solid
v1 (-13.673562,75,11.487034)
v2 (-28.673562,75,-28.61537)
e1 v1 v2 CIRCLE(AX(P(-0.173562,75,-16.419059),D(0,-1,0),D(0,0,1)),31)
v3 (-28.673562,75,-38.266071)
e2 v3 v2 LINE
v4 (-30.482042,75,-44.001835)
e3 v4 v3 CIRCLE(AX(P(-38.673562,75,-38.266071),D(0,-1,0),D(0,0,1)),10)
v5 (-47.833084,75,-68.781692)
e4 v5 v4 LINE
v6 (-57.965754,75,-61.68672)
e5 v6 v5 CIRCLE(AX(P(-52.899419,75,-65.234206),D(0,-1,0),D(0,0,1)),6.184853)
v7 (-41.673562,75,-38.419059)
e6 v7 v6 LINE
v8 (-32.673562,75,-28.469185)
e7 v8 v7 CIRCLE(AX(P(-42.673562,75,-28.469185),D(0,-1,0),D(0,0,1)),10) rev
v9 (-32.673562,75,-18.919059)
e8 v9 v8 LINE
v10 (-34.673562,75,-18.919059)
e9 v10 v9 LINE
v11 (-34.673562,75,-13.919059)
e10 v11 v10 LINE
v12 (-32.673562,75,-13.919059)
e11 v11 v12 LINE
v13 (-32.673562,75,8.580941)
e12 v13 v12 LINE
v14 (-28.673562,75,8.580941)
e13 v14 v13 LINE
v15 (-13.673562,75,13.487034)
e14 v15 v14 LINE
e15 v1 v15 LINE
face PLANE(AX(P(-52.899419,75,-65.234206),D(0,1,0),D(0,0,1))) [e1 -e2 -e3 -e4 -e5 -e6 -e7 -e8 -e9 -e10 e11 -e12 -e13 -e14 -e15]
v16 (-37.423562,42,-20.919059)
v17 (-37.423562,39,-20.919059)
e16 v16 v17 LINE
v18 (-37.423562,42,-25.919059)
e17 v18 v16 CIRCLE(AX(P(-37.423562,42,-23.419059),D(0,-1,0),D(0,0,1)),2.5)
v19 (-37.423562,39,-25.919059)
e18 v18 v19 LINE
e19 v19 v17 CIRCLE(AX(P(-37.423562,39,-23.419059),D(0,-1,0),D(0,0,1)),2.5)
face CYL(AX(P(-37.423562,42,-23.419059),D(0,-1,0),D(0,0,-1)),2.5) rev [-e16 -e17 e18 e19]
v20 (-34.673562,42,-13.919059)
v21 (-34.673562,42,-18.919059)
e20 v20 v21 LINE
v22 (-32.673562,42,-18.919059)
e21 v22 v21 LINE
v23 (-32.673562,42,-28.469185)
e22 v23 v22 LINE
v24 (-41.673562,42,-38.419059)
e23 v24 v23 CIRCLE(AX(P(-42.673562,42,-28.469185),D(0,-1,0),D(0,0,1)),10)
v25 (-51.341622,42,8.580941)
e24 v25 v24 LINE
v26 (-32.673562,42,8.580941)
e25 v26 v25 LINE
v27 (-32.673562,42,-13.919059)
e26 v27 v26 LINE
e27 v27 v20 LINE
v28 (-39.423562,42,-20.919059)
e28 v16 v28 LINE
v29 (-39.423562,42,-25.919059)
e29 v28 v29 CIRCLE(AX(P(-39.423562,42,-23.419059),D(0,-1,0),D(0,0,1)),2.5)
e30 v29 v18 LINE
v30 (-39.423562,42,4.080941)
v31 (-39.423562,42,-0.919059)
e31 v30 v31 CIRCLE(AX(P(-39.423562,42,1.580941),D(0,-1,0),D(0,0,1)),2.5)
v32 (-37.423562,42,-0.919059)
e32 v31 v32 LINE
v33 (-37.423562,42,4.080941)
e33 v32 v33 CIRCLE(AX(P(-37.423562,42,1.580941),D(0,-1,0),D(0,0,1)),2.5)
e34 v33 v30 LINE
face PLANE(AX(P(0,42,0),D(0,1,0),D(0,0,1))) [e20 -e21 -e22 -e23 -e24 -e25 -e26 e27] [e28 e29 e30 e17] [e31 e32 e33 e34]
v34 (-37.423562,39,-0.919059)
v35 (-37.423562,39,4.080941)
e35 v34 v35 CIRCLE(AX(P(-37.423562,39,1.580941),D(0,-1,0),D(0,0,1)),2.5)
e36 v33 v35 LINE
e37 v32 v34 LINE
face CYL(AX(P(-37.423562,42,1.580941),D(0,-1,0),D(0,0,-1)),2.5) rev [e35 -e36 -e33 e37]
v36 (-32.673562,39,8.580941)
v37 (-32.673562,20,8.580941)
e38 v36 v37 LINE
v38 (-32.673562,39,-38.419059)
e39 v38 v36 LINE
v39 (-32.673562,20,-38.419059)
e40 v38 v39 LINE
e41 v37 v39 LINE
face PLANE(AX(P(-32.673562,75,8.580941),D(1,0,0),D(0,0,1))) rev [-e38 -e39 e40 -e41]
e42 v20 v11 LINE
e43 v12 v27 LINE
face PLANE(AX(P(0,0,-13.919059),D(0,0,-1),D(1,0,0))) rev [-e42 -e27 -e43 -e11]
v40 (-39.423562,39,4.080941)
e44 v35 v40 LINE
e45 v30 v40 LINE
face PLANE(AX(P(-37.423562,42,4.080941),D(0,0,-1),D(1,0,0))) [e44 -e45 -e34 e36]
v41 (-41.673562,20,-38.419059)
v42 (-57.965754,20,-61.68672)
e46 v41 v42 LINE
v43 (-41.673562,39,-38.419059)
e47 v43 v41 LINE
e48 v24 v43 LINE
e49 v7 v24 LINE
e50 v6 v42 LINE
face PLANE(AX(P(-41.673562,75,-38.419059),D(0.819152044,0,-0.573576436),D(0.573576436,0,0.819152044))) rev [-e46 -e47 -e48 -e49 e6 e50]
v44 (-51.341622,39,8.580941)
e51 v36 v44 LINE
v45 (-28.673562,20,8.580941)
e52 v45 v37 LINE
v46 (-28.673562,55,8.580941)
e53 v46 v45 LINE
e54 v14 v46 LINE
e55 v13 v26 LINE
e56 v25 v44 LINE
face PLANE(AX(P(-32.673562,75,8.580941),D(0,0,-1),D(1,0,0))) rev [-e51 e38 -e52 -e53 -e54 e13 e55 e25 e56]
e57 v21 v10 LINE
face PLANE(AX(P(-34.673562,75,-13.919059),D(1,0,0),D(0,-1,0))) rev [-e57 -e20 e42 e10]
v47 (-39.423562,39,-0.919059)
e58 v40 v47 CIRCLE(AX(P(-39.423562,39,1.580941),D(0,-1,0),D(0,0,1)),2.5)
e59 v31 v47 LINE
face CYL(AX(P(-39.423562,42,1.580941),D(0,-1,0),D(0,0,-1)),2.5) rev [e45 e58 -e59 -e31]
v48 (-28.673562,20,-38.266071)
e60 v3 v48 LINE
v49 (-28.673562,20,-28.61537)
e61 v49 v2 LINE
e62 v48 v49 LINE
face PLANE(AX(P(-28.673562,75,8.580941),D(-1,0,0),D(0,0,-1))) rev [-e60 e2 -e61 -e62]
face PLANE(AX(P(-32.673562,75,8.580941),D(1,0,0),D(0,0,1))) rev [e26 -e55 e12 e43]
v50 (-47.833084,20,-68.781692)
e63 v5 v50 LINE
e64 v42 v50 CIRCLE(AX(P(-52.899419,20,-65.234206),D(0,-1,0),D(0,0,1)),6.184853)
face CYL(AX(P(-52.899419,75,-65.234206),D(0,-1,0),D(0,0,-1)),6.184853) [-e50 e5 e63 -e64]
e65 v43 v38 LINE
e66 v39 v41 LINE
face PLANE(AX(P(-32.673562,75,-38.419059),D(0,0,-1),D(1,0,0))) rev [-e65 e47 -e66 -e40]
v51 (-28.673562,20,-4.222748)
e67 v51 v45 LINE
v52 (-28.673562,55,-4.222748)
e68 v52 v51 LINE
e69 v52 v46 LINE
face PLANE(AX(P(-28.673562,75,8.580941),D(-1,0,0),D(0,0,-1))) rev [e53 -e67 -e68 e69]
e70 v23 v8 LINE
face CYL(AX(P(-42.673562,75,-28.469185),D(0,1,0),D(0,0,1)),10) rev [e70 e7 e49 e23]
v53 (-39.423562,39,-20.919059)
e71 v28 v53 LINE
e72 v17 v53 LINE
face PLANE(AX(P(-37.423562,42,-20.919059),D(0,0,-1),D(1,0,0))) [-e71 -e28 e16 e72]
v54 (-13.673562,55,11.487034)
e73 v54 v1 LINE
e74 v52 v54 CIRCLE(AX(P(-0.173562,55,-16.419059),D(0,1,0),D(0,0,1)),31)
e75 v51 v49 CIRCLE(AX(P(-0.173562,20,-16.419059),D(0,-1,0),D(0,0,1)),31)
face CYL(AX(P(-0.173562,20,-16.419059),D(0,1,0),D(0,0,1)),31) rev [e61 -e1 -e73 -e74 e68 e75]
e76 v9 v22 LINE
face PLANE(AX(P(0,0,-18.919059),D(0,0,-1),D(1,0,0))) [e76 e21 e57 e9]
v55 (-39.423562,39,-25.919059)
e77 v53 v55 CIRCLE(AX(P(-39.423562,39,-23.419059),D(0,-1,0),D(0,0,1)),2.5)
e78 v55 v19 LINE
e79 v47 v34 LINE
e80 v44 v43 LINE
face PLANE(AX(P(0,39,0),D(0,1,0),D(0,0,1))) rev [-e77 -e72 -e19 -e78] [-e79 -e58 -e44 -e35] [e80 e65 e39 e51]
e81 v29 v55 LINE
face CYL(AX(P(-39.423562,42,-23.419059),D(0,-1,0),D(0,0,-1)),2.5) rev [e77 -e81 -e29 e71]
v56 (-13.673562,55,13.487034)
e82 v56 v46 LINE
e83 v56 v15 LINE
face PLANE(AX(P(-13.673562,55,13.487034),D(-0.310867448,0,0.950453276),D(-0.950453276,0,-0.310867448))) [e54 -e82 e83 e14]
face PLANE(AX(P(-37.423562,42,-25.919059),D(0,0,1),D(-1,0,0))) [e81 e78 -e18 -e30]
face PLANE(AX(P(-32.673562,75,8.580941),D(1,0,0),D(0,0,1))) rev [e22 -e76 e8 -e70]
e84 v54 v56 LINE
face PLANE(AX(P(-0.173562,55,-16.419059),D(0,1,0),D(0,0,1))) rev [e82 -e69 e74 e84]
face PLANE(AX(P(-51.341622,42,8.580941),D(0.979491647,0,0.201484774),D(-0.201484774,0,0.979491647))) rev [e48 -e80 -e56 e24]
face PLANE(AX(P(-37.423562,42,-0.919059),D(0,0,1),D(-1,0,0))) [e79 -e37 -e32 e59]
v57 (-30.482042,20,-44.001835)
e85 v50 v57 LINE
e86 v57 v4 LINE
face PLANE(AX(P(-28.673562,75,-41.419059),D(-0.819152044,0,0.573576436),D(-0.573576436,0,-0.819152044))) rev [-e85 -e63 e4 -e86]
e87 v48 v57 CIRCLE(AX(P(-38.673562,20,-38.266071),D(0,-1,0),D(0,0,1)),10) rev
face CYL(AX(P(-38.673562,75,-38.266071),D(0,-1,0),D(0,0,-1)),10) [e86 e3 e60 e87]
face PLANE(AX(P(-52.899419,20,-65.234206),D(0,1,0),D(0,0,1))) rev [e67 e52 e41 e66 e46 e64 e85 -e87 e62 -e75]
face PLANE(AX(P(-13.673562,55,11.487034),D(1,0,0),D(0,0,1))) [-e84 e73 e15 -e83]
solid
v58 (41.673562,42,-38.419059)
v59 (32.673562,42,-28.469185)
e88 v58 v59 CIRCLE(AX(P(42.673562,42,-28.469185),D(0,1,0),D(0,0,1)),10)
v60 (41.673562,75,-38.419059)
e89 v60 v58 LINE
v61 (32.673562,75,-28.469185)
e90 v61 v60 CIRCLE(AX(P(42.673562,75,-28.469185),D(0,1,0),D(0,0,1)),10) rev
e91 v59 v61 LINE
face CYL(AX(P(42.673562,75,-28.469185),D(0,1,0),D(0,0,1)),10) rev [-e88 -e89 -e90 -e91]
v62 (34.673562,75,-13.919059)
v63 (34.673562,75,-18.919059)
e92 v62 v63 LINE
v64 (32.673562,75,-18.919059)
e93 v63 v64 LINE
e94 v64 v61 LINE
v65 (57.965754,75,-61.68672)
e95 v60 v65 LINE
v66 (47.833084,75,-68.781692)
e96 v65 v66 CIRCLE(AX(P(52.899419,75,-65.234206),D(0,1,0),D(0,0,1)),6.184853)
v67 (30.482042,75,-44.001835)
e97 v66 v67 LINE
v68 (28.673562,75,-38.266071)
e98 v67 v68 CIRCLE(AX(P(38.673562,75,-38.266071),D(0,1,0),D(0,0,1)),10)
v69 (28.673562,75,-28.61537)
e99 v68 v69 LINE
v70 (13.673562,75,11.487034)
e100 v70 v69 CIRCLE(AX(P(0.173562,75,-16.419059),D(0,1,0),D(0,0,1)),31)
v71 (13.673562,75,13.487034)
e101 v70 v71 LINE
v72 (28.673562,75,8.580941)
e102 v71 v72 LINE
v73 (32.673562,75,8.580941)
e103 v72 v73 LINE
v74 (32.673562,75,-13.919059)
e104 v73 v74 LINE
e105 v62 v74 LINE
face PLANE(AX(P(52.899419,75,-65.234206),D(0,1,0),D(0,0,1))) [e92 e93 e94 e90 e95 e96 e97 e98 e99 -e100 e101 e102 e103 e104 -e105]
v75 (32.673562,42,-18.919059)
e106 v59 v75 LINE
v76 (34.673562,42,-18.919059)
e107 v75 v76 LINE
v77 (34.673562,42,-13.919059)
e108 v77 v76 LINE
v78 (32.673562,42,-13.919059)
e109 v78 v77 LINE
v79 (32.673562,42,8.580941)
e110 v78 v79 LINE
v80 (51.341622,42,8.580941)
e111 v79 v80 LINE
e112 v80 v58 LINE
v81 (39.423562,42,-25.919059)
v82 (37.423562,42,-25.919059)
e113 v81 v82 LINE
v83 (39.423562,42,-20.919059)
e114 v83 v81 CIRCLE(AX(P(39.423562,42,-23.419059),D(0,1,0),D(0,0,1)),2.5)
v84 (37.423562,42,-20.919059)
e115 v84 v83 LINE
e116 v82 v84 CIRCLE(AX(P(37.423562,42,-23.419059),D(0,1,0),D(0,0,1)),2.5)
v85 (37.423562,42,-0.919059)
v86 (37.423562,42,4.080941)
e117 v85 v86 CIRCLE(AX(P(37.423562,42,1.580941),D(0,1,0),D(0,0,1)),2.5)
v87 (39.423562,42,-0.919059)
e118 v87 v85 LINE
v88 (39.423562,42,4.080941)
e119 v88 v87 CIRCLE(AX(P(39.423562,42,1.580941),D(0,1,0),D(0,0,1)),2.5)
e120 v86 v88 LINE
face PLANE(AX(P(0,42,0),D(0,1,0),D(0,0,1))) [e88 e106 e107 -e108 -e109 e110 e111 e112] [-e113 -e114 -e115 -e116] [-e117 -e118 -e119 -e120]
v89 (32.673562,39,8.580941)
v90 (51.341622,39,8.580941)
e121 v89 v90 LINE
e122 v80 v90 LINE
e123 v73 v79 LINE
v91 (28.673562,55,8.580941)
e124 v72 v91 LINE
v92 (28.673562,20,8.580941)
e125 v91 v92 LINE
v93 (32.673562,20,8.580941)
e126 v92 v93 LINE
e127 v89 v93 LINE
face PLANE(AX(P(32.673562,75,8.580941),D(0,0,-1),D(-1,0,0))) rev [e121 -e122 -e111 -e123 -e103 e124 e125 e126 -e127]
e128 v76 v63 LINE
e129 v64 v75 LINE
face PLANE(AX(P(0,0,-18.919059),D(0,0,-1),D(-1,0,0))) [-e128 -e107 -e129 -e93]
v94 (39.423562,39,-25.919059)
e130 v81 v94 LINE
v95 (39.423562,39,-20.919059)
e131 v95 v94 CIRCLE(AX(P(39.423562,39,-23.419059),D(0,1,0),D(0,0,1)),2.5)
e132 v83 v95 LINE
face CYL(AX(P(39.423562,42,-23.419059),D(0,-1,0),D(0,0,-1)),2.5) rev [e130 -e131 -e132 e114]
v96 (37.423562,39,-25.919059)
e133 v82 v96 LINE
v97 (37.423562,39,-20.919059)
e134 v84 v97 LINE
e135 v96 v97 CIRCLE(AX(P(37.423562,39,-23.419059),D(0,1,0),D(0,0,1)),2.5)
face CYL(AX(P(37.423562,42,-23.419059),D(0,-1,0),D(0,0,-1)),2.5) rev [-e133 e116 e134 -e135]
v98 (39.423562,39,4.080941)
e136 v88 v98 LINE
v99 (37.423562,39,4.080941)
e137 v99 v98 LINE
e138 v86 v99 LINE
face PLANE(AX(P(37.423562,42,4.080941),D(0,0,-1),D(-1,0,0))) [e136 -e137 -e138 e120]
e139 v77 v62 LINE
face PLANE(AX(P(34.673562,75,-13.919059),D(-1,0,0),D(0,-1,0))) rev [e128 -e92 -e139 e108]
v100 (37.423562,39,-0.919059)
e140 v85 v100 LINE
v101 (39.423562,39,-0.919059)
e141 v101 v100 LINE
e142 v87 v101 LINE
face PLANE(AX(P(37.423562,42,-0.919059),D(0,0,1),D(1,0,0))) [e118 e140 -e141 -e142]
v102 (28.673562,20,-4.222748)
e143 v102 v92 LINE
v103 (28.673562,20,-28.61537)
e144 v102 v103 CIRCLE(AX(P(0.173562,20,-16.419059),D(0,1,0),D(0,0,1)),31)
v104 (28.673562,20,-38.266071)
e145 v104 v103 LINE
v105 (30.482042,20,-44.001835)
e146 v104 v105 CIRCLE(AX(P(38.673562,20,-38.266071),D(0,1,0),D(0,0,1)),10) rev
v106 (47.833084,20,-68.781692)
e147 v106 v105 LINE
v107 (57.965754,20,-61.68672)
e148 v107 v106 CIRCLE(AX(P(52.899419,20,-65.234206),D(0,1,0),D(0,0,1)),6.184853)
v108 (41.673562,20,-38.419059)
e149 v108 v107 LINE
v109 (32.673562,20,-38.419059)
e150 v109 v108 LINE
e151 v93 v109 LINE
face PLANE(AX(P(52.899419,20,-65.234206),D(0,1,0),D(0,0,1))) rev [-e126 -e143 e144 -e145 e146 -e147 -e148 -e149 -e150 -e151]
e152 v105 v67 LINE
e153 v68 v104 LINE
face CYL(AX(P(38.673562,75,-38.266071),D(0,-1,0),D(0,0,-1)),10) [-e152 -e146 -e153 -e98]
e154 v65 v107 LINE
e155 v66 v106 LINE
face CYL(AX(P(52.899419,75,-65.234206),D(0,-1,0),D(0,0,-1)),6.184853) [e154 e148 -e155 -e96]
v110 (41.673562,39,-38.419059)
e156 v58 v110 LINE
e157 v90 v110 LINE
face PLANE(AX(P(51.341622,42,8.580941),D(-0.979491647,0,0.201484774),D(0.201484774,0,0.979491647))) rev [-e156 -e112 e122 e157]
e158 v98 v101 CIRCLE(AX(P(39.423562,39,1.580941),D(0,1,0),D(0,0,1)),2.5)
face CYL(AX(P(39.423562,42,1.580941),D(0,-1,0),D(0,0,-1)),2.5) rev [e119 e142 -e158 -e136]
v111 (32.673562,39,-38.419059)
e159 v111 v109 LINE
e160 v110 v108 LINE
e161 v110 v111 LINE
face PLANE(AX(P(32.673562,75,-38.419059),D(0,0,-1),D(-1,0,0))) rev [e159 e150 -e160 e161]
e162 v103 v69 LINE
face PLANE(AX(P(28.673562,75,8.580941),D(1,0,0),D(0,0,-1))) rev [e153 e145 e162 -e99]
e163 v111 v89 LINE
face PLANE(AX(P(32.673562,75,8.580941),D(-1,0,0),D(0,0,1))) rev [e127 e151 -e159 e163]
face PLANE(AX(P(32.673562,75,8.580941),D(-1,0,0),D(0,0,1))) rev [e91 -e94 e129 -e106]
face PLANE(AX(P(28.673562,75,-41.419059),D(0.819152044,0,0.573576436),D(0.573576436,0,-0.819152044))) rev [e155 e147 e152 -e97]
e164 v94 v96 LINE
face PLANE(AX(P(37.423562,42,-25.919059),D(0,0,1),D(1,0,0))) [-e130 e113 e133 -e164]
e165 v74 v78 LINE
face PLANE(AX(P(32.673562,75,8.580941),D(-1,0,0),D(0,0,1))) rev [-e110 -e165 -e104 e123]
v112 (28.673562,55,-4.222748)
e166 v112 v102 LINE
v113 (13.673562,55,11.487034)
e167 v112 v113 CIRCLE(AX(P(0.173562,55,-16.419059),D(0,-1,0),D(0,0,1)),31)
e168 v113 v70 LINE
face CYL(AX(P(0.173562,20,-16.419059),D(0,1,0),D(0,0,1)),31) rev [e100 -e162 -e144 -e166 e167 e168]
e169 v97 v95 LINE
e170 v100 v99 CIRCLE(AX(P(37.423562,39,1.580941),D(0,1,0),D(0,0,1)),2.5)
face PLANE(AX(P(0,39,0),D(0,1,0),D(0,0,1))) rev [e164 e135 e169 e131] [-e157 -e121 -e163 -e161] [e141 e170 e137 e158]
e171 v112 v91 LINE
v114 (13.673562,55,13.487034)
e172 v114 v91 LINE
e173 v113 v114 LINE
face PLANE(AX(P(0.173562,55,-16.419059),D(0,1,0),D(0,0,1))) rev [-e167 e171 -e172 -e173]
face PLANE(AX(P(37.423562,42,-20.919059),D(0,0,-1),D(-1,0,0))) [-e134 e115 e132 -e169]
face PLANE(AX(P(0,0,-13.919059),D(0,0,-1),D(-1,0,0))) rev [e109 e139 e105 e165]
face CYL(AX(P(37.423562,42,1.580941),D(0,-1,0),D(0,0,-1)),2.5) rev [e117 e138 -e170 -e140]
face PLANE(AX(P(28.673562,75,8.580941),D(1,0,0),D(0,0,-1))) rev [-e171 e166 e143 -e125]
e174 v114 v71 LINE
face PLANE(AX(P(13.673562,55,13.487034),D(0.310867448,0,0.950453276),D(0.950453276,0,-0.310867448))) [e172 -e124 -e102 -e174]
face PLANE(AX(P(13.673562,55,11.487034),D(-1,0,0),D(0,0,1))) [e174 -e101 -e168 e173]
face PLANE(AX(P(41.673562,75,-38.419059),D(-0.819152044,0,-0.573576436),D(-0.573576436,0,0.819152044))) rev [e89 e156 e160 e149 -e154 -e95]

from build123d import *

# Parameters (mm, degrees)
BOSS_EXTRU_1_DEPTH      = 55
CONG_1_R                = 10
ESQUISSE2_R             = 31
ENL_V_MAT_EXTRU_1_DEPTH = 108.780485936
BOSS_EXTRU_2_DEPTH      = 3
ESQUISSE4_W             = 2
ESQUISSE4_H             = 33
BOSS_EXTRU_3_DEPTH      = 2.5
CONG_2_R                = 10
BOSS_EXTRU_4_DEPTH      = 20


with BuildPart() as part:
    # Esquisse1 → Boss.-Extru.1 (new body)
    with BuildSketch(Plane(origin=(0, 20, 0), x_dir=(1, 0, 0), z_dir=(0, 1, 0))):
        with BuildLine():
            Line((32.673562069, -8.580941108), (32.673562069, 38.419058892))
            Line((32.673562069, 38.419058892), (41.673562069, 38.419058892))
            Line((41.673562069, 38.419058892), (57.965753801, 61.686720039))
            ThreePointArc((57.965753801, 61.686720039), (56.44690478, 70.300540881), (47.833083938, 68.781691859))
            Line((47.833083938, 68.781691859), (28.673562069, 41.419058892))
            Line((28.673562069, 41.419058892), (28.673562069, -8.580941108))
            Line((28.673562069, -8.580941108), (32.673562069, -8.580941108))
        make_face()
    extrude(amount=BOSS_EXTRU_1_DEPTH)

    # Congé1
    cong_1_edges = [part.edges().sort_by_distance(p)[0] for p in [
        (28.673562069, 47.5, -41.419058892),
    ]]
    fillet(cong_1_edges, radius=CONG_1_R)

    # Esquisse2 → Enlèv. mat.-Extru.1 (cut, through all)
    with BuildSketch(Plane(origin=(0, 75, 0), x_dir=(1, 0, 0), z_dir=(0, 1, 0))):
        with Locations((0.173562069, 16.419058892)):
            Circle(ESQUISSE2_R)
    extrude(amount=-ENL_V_MAT_EXTRU_1_DEPTH, mode=Mode.SUBTRACT)

    # Esquisse3 → Boss.-Extru.2 (add)
    with BuildSketch(Plane(origin=(0, 39, 0), x_dir=(1, 0, 0), z_dir=(0, 1, 0))):
        Polygon((32.673562069, -8.580941108), (32.673562069, 38.419058892), (41.673562069, 38.419058892), (51.341622453, -8.580941108), align=None)
        with BuildLine():
            Line((37.423562069, 25.919058892), (39.423562069, 25.919058892))
            ThreePointArc((39.423562069, 25.919058892), (41.923562069, 23.419058892), (39.423562069, 20.919058892))
            Line((39.423562069, 20.919058892), (37.423562069, 20.919058892))
            ThreePointArc((37.423562069, 20.919058892), (34.923562069, 23.419058892), (37.423562069, 25.919058892))
        make_face(mode=Mode.SUBTRACT)
        with BuildLine():
            Line((37.423562069, 0.919058892), (39.423562069, 0.919058892))
            ThreePointArc((39.423562069, 0.919058892), (41.923562069, -1.580941108), (39.423562069, -4.080941108))
            Line((39.423562069, -4.080941108), (37.423562069, -4.080941108))
            ThreePointArc((37.423562069, -4.080941108), (34.923562069, -1.580941108), (37.423562069, 0.919058892))
        make_face(mode=Mode.SUBTRACT)
    extrude(amount=BOSS_EXTRU_2_DEPTH)

    # Esquisse4 → Boss.-Extru.3 (add, symmetric)
    with BuildSketch(Plane.XY.offset(-16.419058892)):
        with Locations((33.673562069, 58.5)):
            Rectangle(ESQUISSE4_W, ESQUISSE4_H)
    extrude(amount=BOSS_EXTRU_3_DEPTH, both=True)

    # Congé2
    # the kernel refuses this fillet: 10 mm, written as the material it adds along each edge
    with BuildSketch(Plane(origin=(32.673562069, 17.125314072, -38.419058892), x_dir=(0, 0, 1), z_dir=(0, 1, 0))) as cong_2_piece_1_section:
        with BuildLine():
            CenterArc((9.949874371, 10), CONG_2_R, 185.739170477, 84.260829523)
            Line((0, 9), (0, 0))
            Line((0, 0), (9.949874371, 0))
        make_face()
    cong_2_piece_1 = extrude(amount=57.874685928, mode=Mode.PRIVATE)
    cong_2_piece_1 = split(cong_2_piece_1, bisect_by=Plane(origin=(35.242531185, 39, -35.190804861), z_dir=(0, 1, 0)), keep=Keep.TOP, mode=Mode.PRIVATE)
    add(cong_2_piece_1)

    # Esquisse5 → Boss.-Extru.4 (add)
    with BuildSketch(Plane(origin=(0, 75, 0), x_dir=(1, 0, 0), z_dir=(0, 1, 0))):
        with BuildLine():
            Line((13.673562069, -11.487033633), (13.673562069, -13.487033633))
            Line((13.673562069, -13.487033633), (28.673562069, -8.580941108))
            Line((28.673562069, -8.580941108), (32.673562069, -8.580941108))
            Line((32.673562069, -8.580941108), (32.673562069, 4.222747974))
            Line((32.673562069, 4.222747974), (28.673562069, 4.222747974))
            ThreePointArc((28.673562069, 4.222747974), (22.594518997, -4.988899686), (13.673562069, -11.487033633))
        make_face()
    extrude(amount=-BOSS_EXTRU_4_DEPTH)


with BuildPart() as body_2:
    # Symétrie1: mirrored copy
    add(part.part.mirror(Plane(origin=(0, 0, 0), x_dir=(0, 0, 1), z_dir=(1, 0, 0))))


solid = Compound([part.part, body_2.part])
